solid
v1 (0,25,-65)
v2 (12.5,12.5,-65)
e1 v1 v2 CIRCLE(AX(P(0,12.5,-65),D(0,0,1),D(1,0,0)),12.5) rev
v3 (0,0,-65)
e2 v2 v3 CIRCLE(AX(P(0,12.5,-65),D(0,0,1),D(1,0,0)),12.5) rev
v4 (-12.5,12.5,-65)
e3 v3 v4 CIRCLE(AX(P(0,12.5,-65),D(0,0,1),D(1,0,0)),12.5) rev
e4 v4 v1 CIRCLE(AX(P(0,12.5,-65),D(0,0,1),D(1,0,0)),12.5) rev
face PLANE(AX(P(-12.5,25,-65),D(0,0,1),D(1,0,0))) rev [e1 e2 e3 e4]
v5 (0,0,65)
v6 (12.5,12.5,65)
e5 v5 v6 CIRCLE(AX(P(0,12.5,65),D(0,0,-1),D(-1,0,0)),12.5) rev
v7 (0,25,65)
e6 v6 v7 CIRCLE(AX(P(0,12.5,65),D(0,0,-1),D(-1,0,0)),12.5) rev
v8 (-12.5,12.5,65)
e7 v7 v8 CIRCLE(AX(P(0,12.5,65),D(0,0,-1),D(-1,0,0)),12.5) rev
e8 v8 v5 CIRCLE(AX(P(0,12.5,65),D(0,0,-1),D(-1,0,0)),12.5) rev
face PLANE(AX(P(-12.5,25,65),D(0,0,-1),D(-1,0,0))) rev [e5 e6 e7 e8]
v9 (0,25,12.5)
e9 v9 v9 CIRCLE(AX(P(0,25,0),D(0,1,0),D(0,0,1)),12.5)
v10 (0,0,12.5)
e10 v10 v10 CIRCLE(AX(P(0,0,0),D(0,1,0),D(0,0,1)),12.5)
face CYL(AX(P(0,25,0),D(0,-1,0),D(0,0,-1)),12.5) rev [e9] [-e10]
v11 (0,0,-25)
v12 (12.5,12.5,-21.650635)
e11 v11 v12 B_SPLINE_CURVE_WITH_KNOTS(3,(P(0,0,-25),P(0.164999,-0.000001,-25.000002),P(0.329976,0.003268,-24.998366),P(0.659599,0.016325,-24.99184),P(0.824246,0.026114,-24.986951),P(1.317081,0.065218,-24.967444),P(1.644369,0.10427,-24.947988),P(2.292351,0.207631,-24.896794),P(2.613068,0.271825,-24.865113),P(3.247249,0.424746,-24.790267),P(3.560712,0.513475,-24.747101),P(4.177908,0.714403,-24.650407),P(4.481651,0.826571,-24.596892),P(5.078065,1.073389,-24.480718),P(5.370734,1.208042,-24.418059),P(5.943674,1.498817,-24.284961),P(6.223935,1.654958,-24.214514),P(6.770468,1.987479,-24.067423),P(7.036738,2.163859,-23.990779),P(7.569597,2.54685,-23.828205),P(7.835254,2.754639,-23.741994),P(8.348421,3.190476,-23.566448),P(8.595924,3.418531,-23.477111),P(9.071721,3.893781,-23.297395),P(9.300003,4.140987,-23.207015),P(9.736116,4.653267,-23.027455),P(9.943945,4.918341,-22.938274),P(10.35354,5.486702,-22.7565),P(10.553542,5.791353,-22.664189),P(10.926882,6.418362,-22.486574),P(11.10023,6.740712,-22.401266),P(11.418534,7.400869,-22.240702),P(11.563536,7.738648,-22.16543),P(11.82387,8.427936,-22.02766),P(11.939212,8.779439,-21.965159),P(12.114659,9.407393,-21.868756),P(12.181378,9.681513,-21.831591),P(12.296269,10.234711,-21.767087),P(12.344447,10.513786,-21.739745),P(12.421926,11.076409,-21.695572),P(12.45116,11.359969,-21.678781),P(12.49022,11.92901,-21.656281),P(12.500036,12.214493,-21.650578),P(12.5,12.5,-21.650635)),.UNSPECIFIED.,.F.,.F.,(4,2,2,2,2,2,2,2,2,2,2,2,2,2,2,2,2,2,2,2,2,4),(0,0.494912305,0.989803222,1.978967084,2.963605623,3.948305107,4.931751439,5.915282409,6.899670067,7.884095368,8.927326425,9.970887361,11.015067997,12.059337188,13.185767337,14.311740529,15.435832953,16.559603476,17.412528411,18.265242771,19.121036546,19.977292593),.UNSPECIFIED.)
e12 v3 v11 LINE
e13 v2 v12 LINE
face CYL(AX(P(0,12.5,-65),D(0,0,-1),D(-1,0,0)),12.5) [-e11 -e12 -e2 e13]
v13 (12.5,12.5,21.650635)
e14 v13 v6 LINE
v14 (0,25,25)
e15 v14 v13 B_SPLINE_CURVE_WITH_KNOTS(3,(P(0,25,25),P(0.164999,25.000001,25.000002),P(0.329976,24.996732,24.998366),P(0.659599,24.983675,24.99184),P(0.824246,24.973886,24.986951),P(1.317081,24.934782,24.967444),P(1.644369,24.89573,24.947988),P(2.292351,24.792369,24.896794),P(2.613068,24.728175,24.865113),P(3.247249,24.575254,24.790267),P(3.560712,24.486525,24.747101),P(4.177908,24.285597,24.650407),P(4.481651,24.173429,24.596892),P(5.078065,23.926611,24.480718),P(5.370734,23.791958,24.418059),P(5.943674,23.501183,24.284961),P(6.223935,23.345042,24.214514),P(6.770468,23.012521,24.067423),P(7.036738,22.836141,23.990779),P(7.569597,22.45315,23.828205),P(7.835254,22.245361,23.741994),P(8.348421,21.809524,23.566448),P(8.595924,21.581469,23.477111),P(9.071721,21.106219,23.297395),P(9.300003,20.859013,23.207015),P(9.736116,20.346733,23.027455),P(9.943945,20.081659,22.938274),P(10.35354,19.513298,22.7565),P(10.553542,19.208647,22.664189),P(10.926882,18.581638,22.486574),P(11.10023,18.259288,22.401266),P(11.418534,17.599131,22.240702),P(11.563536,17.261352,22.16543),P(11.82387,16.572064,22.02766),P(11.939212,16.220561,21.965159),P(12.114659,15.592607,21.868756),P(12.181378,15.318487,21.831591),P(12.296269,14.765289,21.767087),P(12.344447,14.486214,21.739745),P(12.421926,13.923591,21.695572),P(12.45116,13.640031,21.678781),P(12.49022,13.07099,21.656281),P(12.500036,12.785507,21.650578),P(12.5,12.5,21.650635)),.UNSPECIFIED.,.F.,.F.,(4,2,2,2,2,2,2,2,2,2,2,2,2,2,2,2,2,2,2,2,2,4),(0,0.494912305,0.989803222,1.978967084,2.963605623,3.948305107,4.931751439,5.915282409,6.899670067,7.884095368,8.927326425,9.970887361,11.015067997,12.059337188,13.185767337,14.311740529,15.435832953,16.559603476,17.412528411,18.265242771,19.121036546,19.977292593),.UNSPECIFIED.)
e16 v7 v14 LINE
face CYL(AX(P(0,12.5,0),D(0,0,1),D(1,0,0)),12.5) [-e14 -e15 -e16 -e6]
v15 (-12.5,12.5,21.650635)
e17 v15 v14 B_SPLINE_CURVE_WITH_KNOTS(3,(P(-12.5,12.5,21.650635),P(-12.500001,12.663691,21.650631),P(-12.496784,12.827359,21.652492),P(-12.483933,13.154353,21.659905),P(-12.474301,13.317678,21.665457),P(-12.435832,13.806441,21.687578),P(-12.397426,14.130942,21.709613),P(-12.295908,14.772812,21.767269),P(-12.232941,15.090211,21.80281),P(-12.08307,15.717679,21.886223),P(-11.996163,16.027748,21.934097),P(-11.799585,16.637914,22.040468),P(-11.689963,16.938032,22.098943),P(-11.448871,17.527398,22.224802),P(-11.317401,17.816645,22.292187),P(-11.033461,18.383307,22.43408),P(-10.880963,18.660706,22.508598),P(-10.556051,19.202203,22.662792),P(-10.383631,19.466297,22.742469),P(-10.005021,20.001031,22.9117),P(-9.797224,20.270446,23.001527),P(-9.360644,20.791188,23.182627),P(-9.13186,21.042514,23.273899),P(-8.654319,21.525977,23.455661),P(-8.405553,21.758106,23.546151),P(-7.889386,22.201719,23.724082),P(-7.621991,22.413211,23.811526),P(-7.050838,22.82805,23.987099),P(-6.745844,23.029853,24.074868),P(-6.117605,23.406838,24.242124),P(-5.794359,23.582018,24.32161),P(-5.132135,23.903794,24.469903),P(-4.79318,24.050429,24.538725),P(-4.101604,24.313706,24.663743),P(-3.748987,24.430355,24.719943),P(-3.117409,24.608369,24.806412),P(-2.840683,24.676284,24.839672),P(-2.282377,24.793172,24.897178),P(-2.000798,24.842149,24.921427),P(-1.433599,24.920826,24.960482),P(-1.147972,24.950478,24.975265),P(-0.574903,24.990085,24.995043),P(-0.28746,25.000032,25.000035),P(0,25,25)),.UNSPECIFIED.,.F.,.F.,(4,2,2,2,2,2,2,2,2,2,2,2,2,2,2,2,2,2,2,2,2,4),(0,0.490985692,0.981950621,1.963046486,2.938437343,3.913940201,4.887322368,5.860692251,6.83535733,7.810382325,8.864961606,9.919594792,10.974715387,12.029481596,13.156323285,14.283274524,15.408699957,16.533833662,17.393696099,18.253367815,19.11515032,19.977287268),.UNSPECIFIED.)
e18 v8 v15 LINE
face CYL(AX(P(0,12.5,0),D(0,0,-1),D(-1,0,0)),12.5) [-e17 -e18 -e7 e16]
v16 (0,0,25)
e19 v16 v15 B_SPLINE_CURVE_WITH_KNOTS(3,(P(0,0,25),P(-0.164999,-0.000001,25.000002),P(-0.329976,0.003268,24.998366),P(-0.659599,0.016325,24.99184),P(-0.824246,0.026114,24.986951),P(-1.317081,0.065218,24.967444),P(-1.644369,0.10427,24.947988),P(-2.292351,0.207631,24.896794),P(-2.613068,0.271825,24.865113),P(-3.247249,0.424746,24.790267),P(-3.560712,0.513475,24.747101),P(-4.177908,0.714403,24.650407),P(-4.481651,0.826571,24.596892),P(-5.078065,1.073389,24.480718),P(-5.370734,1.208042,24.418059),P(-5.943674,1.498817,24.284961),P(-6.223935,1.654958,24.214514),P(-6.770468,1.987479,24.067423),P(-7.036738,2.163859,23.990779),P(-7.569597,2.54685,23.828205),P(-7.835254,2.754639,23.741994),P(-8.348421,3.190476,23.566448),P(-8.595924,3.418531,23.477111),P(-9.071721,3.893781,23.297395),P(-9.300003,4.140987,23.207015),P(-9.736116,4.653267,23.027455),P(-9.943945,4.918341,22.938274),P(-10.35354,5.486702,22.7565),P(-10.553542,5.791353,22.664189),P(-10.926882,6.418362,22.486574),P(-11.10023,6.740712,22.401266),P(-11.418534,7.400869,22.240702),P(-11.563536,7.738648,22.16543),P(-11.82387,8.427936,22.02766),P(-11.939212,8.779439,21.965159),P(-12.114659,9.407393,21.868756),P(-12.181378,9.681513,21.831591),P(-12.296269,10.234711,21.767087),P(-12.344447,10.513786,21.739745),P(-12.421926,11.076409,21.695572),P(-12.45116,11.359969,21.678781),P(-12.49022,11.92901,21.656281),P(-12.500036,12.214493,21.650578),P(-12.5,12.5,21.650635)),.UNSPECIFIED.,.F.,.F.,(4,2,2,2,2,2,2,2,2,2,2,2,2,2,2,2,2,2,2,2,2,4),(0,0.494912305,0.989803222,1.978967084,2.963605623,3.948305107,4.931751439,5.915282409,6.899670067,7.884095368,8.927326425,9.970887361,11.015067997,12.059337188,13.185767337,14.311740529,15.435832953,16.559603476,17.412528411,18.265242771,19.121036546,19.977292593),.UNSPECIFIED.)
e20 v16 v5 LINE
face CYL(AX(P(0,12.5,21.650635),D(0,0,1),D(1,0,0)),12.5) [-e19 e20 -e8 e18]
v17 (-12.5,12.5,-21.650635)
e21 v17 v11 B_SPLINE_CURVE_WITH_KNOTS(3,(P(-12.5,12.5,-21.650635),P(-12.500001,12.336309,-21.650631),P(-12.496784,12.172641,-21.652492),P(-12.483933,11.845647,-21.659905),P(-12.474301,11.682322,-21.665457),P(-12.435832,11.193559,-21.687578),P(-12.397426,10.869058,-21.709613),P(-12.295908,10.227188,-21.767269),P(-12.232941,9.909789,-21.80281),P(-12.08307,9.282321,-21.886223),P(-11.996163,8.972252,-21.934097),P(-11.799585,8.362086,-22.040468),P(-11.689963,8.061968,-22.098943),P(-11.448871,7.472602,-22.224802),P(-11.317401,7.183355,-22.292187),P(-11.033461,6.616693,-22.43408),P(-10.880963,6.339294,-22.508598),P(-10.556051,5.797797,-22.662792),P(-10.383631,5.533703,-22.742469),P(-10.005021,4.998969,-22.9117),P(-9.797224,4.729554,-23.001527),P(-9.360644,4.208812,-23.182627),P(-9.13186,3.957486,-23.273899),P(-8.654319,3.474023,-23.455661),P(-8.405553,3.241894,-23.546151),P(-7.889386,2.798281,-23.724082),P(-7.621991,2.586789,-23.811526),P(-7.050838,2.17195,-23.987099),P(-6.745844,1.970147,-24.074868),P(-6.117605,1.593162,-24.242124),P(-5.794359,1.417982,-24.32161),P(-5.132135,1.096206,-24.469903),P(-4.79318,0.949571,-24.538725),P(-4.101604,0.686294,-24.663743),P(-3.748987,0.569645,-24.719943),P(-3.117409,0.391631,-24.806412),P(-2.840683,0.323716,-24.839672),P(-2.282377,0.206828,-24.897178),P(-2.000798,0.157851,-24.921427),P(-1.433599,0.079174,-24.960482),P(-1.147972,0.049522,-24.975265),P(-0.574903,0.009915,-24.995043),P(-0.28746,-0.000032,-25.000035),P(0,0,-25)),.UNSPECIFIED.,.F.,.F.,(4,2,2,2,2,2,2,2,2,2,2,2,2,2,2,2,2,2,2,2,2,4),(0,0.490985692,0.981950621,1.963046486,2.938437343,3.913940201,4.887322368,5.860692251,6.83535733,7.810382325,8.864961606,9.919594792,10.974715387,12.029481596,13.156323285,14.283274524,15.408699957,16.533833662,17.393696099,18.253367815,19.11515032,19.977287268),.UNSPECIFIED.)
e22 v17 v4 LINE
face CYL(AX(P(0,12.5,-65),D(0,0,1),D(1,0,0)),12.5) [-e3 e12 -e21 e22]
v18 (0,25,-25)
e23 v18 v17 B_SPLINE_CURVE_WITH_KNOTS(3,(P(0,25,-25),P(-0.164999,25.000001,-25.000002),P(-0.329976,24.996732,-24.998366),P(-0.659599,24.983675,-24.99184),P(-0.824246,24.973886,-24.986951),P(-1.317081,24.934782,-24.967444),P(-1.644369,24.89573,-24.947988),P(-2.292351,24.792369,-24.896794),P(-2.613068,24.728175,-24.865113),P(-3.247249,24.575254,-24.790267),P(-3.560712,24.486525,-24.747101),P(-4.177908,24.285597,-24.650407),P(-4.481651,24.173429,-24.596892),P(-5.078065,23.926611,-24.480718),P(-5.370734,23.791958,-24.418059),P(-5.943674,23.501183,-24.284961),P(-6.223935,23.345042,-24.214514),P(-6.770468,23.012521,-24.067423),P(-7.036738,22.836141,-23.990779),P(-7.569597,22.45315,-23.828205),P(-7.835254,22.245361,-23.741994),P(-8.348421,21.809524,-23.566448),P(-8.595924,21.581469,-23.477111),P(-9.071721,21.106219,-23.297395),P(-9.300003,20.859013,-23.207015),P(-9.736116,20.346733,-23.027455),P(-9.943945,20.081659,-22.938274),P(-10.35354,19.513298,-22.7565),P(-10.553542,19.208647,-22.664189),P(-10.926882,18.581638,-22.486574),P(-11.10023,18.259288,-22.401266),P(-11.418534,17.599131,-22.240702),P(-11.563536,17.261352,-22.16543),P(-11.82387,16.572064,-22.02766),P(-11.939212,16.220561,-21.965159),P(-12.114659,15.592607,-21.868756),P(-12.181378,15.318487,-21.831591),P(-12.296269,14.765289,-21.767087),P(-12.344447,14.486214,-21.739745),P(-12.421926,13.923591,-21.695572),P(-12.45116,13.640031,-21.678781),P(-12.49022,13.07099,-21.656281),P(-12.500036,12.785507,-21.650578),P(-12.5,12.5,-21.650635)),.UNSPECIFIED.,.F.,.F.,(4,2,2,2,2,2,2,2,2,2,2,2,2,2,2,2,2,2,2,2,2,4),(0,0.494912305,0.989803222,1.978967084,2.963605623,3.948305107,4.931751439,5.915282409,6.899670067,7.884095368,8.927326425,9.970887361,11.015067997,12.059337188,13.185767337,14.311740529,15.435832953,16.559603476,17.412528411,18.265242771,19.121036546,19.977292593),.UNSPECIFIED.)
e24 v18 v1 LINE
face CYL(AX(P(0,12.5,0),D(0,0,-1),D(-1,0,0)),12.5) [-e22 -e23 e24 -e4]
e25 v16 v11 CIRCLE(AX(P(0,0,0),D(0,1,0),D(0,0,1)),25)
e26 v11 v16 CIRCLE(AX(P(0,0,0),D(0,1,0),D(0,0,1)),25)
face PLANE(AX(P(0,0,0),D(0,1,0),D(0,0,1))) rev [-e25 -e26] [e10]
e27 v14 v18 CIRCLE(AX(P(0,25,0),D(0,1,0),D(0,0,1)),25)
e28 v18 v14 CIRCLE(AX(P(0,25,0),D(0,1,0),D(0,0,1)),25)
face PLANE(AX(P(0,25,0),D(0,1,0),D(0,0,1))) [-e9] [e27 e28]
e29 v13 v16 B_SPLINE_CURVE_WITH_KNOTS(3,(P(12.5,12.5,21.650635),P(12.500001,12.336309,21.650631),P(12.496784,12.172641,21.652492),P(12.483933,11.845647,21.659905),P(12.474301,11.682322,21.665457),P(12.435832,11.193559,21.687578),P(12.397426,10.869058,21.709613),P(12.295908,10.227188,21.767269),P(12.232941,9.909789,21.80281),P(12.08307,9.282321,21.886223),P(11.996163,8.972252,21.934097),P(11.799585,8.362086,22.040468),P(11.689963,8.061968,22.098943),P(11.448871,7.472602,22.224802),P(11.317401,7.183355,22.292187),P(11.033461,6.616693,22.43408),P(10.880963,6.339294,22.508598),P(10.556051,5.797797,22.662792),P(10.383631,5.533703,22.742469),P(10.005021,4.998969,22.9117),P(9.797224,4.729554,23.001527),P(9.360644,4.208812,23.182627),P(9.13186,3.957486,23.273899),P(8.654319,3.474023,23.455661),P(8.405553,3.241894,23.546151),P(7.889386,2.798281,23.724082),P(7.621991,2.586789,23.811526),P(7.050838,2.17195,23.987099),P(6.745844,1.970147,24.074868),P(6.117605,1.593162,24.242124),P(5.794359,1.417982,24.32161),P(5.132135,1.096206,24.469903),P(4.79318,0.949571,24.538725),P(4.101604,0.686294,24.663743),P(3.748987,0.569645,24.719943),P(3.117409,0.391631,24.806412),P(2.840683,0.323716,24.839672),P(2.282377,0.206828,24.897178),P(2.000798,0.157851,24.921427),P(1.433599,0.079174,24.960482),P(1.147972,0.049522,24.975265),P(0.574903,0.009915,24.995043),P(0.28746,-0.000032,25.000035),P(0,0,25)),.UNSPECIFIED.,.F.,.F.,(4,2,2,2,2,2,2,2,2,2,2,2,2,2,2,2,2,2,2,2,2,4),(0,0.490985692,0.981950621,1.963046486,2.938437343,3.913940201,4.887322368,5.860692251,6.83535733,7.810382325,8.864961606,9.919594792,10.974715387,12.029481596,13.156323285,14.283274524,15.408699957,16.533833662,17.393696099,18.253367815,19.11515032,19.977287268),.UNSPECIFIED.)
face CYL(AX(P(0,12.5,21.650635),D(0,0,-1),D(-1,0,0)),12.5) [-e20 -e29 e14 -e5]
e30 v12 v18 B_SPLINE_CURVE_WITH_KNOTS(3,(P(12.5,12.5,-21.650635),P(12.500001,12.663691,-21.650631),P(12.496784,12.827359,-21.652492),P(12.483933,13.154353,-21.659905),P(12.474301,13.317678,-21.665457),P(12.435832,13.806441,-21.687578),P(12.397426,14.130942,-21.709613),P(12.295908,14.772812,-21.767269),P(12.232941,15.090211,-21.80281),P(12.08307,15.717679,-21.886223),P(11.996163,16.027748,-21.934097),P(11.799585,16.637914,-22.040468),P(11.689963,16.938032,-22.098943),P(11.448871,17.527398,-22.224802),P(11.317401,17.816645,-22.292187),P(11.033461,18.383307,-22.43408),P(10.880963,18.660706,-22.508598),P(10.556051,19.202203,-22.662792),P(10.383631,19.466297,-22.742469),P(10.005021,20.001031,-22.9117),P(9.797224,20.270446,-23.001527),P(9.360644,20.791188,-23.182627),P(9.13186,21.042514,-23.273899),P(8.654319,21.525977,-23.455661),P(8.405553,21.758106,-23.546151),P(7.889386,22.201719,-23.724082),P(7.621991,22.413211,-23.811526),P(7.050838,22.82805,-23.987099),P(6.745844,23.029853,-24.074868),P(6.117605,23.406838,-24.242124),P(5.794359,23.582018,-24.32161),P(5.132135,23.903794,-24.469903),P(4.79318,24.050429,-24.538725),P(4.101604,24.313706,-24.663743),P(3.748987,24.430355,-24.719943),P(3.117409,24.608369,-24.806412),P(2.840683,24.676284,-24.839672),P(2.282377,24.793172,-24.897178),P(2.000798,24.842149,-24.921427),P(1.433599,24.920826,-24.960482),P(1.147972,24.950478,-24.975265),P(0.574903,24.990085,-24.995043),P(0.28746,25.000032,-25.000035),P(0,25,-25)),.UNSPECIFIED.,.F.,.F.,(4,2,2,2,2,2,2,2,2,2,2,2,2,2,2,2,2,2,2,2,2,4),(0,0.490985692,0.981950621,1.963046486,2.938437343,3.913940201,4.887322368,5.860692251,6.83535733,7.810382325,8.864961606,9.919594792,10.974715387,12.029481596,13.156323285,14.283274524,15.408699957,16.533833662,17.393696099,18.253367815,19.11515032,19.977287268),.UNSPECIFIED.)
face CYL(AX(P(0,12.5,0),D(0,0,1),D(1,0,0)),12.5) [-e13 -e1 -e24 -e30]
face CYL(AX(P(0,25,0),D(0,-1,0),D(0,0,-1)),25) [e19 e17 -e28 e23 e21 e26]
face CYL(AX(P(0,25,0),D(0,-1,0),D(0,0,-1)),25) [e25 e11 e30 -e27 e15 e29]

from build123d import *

# Parameters (mm, degrees)
ESBO_O1_R                = 12.5
RESSALTO_EXTRUS_O1_DEPTH = 25
FILETE1_R                = 12.5


with BuildPart() as part:
    # Esboço1 → Ressalto-extrusão1 (new body)
    with BuildSketch(Plane(origin=(0, 0, 0), x_dir=(1, 0, 0), z_dir=(0, 1, 0))):
        with BuildLine():
            Line((-12.5, -21.650635095), (-12.5, -65))
            Line((-12.5, -65), (12.5, -65))
            Line((12.5, -65), (12.5, -21.650635095))
            ThreePointArc((12.5, -21.650635095), (25, 0), (12.5, 21.650635095))
            Line((12.5, 21.650635095), (12.5, 65))
            Line((12.5, 65), (-12.5, 65))
            Line((-12.5, 65), (-12.5, 21.650635095))
            ThreePointArc((-12.5, 21.650635095), (-25, 0), (-12.5, -21.650635095))
        make_face()
        with Locations(Location((0, 0, 0), (0, 0, 270))):
            Circle(ESBO_O1_R, mode=Mode.SUBTRACT)
    extrude(amount=RESSALTO_EXTRUS_O1_DEPTH)

    # Filete1
    filete1_edges = [part.edges().sort_by_distance(p)[0] for p in [
        (-12.5, 0, -43.325317547),
        (12.5, 0, -43.325317547),
        (-12.5, 25, -43.325317547),
        (12.5, 25, -43.325317547),
        (-12.5, 0, 43.325317547),
        (12.5, 0, 43.325317547),
        (12.5, 25, 43.325317547),
        (-12.5, 25, 43.325317547),
    ]]
    fillet(filete1_edges, radius=FILETE1_R - 0.0001)  # a hair under: the kernel refuses the full size


solid = part.part
